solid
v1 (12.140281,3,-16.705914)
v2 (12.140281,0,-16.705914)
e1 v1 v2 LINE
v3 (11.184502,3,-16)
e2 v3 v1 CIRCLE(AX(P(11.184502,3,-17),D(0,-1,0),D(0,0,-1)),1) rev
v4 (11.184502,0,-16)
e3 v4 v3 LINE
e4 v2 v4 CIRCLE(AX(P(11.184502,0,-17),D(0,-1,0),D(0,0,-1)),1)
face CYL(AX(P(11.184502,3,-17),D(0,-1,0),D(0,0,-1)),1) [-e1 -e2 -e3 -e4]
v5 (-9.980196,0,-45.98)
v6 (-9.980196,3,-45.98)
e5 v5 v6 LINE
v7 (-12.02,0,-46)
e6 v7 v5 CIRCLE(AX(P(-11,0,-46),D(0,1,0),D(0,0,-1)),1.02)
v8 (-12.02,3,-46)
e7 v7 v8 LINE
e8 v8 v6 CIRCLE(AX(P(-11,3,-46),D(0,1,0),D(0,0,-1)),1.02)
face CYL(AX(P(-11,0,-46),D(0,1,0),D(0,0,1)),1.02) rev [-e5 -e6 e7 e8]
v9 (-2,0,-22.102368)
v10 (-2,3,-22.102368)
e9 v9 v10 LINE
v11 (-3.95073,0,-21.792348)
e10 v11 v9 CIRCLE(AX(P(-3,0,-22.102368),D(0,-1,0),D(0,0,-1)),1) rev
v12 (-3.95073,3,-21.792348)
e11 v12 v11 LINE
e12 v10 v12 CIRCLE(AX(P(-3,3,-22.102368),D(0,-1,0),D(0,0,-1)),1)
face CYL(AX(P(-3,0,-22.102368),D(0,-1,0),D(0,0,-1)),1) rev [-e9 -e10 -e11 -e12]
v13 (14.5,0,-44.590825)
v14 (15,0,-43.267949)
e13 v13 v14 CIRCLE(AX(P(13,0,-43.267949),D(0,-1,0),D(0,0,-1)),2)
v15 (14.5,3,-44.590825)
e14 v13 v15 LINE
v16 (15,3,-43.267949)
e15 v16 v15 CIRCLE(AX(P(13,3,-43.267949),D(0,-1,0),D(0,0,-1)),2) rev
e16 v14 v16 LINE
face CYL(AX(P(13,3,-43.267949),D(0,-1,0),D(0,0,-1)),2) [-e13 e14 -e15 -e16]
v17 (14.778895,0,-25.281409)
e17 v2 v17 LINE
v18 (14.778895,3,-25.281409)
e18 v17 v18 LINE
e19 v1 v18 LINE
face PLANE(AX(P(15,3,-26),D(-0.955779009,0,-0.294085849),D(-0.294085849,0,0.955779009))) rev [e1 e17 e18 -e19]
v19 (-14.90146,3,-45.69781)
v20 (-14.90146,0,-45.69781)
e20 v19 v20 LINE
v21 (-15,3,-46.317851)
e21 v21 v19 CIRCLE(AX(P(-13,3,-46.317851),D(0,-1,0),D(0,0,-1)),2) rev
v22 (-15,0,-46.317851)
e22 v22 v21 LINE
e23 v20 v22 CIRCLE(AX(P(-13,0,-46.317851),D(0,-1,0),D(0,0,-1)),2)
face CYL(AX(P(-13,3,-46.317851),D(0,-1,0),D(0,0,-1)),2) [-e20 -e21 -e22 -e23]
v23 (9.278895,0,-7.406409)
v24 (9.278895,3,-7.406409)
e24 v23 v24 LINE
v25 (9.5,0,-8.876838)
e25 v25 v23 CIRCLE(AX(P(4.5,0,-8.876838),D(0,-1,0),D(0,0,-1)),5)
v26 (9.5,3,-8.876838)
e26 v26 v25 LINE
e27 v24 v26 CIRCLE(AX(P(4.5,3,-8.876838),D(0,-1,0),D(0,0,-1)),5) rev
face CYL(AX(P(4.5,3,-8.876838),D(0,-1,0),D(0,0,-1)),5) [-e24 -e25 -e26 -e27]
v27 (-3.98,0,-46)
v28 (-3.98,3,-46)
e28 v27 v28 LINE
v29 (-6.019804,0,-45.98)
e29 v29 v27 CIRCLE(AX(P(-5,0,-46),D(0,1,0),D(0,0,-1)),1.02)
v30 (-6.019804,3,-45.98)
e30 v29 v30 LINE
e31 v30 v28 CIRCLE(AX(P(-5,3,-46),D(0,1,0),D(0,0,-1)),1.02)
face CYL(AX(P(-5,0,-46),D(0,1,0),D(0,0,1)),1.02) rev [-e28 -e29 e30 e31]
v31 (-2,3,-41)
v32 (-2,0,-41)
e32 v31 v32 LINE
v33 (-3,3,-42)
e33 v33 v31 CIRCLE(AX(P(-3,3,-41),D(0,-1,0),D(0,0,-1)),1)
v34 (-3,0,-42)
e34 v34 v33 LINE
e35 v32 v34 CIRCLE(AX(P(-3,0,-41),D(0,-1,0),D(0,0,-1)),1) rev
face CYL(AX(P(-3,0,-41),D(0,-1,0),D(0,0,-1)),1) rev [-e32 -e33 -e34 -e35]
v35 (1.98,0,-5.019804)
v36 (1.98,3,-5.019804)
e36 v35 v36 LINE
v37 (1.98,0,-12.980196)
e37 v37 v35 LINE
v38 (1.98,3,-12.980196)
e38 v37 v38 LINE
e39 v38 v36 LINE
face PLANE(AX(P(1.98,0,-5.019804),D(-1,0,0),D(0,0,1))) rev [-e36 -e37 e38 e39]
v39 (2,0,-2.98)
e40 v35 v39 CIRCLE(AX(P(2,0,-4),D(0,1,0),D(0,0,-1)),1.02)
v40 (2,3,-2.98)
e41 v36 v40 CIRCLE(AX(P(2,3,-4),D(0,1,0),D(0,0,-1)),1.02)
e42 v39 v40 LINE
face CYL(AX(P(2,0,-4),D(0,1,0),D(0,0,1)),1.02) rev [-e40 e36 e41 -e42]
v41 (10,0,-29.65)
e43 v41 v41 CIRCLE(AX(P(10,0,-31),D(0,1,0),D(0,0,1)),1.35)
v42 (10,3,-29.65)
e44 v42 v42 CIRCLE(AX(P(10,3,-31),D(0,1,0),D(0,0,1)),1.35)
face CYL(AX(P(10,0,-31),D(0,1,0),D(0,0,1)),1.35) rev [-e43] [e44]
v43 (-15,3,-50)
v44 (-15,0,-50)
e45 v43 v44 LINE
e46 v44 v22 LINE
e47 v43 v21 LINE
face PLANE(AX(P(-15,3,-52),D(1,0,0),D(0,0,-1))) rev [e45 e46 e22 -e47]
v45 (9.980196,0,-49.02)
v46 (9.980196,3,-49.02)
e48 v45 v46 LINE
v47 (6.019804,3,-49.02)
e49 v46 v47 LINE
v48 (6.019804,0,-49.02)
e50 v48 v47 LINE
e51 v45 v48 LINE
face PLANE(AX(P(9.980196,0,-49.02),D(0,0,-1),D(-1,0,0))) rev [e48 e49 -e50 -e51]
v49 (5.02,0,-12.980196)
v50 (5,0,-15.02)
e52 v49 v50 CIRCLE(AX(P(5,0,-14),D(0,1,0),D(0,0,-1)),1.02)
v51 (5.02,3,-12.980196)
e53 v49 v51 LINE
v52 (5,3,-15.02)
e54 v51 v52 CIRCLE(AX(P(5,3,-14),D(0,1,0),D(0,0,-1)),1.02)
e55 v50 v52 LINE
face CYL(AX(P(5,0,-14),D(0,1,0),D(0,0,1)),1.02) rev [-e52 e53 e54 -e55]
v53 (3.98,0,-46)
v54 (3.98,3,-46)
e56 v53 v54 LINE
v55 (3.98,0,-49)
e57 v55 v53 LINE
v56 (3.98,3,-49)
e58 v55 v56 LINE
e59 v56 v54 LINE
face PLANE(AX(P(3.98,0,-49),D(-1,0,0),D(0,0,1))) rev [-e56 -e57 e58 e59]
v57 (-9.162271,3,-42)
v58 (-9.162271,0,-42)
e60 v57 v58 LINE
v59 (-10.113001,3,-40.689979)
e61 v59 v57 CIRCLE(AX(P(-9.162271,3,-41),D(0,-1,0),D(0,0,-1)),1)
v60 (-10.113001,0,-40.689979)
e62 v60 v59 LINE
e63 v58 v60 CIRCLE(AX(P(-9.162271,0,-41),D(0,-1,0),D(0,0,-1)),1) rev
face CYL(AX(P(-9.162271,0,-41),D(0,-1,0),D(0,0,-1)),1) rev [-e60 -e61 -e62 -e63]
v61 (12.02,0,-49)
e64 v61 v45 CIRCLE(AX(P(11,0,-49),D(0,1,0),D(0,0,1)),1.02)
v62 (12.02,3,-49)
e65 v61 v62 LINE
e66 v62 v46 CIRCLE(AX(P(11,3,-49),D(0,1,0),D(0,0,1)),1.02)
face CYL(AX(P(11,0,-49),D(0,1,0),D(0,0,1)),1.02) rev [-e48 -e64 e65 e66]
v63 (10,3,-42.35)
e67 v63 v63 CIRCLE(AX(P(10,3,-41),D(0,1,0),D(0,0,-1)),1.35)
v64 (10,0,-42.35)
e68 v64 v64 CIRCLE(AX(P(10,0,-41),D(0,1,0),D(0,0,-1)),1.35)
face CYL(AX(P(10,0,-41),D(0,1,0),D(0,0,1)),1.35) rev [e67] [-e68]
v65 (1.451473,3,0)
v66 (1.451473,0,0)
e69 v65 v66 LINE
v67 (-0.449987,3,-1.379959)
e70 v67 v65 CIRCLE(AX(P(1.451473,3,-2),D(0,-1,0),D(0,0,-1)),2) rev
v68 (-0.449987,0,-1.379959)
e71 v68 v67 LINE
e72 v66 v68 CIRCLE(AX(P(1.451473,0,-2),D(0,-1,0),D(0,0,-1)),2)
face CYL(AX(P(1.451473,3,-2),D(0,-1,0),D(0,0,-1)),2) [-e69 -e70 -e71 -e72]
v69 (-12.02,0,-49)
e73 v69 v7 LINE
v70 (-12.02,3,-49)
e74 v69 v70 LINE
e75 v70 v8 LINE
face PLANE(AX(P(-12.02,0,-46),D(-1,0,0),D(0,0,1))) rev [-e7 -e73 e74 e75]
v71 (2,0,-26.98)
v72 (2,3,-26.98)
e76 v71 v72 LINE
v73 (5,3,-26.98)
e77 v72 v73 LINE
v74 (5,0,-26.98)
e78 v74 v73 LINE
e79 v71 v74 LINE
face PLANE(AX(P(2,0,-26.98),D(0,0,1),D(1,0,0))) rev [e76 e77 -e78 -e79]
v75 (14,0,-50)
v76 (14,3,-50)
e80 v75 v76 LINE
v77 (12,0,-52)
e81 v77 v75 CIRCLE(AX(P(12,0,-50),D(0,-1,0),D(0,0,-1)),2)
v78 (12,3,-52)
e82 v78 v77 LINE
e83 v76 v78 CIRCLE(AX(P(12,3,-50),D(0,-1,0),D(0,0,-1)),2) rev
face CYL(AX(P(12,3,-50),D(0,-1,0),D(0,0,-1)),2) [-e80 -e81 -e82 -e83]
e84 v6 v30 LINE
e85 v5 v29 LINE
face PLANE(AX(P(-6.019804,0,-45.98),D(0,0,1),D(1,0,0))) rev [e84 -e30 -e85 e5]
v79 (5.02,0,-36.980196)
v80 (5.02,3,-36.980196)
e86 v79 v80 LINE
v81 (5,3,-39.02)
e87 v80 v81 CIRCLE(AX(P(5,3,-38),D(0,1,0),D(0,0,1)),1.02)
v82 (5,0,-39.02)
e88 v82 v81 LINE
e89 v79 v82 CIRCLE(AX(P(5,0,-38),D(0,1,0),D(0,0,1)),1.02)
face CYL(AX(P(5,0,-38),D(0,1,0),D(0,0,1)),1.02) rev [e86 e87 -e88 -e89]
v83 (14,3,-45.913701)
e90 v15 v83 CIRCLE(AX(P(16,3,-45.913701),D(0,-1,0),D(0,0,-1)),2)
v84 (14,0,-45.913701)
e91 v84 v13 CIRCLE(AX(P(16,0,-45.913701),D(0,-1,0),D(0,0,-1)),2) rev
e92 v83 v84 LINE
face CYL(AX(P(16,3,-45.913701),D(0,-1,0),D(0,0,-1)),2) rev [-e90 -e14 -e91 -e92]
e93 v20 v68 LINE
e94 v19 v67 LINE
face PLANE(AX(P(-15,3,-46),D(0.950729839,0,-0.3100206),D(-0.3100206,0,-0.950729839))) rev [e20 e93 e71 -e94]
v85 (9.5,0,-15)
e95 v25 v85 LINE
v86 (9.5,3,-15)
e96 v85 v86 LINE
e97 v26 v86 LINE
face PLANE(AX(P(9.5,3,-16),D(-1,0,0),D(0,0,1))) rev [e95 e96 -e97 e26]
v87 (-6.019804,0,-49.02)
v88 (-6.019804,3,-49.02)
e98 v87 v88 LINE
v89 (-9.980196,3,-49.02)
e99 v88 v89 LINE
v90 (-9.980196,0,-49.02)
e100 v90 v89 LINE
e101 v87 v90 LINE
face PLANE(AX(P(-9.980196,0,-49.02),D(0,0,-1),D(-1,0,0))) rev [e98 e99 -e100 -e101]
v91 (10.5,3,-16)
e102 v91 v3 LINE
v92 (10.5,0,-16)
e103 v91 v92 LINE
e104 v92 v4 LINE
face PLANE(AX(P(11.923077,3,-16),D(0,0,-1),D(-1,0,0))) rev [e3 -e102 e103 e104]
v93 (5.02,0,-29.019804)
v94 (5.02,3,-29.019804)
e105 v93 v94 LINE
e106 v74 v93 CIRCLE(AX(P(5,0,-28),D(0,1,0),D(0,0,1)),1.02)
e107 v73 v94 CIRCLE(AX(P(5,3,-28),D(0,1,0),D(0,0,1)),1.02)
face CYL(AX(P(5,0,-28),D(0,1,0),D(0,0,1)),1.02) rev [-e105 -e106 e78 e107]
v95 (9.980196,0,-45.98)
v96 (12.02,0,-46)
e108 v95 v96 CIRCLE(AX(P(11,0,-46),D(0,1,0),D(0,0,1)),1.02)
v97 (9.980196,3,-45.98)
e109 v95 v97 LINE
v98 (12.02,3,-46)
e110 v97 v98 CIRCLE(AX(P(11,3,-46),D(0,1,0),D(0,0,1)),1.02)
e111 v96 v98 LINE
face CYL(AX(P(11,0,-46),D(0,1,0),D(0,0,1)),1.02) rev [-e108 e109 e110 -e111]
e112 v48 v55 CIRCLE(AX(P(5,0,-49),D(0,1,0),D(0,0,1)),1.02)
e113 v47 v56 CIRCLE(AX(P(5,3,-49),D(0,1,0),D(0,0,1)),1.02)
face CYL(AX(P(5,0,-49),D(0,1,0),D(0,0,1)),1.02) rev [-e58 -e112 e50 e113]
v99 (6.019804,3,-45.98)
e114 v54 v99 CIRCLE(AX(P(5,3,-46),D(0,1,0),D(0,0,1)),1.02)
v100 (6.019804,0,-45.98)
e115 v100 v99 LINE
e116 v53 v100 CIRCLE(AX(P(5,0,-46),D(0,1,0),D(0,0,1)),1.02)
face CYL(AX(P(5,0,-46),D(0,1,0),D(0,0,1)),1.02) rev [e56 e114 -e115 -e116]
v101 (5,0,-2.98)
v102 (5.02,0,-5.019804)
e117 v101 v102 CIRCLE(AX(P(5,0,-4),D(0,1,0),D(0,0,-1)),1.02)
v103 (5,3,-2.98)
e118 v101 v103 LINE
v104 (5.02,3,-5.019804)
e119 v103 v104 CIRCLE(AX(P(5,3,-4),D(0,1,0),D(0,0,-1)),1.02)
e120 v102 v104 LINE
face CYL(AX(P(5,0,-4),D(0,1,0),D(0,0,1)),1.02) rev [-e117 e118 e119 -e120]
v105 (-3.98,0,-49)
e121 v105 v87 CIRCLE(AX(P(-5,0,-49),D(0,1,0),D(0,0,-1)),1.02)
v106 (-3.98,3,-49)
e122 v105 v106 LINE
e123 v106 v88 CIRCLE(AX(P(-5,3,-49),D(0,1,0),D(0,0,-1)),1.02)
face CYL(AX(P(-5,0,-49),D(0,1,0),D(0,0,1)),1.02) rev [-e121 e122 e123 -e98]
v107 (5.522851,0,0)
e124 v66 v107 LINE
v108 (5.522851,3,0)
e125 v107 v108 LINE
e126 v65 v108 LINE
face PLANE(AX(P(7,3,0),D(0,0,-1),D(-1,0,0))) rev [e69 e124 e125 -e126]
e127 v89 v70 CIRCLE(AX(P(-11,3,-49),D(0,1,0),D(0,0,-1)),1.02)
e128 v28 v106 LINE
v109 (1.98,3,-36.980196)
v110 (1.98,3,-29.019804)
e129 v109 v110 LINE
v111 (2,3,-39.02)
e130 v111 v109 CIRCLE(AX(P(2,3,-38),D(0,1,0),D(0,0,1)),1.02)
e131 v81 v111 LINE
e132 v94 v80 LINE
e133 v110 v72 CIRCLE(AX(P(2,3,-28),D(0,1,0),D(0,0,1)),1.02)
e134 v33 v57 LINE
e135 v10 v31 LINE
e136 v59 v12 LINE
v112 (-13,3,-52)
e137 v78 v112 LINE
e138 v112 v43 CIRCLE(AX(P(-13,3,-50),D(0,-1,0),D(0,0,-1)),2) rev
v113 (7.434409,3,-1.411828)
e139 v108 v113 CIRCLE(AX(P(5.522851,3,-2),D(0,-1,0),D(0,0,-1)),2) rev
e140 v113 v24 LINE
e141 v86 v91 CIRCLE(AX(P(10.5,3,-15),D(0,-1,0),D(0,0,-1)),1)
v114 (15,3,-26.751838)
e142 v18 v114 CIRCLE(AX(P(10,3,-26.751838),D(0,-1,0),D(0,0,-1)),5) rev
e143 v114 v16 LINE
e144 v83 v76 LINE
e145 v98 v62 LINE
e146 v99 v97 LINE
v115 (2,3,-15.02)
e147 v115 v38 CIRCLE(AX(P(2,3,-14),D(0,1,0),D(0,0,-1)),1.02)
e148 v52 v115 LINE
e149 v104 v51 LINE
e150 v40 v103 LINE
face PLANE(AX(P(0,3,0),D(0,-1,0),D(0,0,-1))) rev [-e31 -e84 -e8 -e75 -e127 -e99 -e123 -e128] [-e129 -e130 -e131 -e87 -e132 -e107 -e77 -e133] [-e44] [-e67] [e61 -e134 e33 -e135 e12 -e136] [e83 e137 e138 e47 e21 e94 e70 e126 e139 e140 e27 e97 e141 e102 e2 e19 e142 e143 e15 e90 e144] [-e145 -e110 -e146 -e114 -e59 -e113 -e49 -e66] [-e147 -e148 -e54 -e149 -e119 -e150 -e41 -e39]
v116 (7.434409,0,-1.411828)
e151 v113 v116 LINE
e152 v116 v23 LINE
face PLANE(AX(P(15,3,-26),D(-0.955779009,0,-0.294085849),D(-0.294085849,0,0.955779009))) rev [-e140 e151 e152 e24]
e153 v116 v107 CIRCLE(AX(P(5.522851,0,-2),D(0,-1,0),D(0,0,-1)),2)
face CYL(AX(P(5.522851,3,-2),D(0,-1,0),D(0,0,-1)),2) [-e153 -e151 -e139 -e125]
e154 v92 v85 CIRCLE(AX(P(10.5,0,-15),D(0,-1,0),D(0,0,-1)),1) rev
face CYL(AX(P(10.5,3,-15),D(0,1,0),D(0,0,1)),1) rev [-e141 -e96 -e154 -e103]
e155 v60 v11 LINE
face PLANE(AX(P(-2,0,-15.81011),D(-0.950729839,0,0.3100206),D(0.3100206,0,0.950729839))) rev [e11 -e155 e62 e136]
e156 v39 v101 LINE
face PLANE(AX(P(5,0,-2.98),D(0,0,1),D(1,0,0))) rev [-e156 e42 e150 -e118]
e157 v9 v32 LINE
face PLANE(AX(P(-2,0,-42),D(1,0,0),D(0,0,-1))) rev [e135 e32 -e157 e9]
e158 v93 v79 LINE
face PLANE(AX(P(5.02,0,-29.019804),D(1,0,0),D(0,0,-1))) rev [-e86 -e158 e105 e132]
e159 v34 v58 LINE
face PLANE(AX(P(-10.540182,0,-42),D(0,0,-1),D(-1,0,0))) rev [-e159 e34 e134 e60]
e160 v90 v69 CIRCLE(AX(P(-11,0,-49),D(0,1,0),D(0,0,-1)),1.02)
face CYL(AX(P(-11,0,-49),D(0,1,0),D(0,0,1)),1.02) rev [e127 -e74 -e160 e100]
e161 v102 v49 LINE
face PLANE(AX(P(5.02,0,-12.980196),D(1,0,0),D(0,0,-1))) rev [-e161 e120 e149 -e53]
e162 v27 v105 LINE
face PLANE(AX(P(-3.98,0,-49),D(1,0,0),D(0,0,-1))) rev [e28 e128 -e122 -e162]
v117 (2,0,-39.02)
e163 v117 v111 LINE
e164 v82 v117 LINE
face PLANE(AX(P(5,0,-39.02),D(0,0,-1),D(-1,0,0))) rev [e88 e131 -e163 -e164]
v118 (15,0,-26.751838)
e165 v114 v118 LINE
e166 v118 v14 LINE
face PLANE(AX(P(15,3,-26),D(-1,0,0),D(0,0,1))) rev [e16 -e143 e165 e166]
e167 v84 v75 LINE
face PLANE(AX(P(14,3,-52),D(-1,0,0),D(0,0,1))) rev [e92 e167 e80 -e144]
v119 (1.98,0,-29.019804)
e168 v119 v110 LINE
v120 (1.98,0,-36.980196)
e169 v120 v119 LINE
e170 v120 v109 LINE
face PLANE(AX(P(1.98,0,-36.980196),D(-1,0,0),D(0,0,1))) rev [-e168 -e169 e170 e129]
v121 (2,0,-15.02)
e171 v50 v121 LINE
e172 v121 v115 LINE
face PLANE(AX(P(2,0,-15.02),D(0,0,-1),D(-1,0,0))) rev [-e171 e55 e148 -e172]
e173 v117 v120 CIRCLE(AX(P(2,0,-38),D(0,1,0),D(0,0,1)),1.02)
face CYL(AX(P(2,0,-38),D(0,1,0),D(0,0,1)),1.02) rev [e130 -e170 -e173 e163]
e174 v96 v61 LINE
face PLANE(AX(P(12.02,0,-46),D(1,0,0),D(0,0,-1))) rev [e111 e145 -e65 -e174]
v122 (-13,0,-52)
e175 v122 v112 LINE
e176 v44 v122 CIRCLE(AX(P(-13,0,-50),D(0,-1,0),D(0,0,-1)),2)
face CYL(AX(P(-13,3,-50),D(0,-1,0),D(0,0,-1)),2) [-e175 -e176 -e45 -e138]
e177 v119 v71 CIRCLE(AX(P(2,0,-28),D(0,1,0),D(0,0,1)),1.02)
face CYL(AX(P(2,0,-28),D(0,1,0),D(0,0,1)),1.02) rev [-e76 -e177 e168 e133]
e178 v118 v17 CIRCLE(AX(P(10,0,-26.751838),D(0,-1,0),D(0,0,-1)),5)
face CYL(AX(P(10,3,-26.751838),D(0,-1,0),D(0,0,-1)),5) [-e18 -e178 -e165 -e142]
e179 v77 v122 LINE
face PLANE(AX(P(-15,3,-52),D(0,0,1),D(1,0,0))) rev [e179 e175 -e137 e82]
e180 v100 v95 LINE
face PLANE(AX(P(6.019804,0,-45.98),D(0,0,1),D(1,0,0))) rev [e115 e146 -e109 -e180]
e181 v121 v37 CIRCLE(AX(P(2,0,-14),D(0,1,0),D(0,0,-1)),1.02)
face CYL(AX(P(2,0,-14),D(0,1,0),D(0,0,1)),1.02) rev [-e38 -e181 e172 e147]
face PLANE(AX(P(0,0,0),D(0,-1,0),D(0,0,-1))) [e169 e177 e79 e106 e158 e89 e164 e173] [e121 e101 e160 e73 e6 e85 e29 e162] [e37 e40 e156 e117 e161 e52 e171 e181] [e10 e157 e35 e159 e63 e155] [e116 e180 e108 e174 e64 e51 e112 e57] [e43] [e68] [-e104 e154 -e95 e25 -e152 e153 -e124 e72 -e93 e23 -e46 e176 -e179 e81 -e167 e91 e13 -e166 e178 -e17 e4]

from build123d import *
from OCP.BRepFilletAPI import BRepFilletAPI_MakeFillet

# Parameters (mm, degrees)
SKETCH_1_W             = 3
SKETCH_1_H             = 12
SKETCH_1_W_2           = 8
SKETCH_1_H_2           = 3
EXTRUDE_1_DEPTH        = 3
SKETCH_3_R             = 1
CUT_EXTRUDE_1_DEPTH    = 55.203320931
SKETCH_4_W             = 1
SKETCH_4_H             = 7
CUT_EXTRUDE_2_DEPTH    = 55.203320931
SKETCH_6_R             = 1.35
CUT_EXTRUDE_3_DEPTH    = 55.203320931
CUT_EXTRUDE_4_DEPTH    = 55.203320931
CUT_EXTRUDE_6_DEPTH    = 55.203320931
FILLET_1_R             = 2
FILLET_2_R1            = 5
FILLET_2_R2            = 1
FILLET_2_R3            = 2
CUT_EXTRUDE_5602_DEPTH = 55.203320931
FILLET_3_R1            = 1
FILLET_3_R2            = 5


with BuildPart() as part:
    # 草图1 → 凸台-拉伸1 (new body)
    with BuildSketch(Plane(origin=(0, 0, 0), x_dir=(1, 0, 0), z_dir=(0, 1, 0))):
        Polygon((15, 26), (15, 52), (0, 52), (-15, 52), (-15, 46), (0, 0), (7, 0), align=None)
        with Locations((3.5, 9)):
            Rectangle(SKETCH_1_W, SKETCH_1_H, mode=Mode.SUBTRACT)
        with Locations((3.5, 33)):
            Rectangle(SKETCH_1_W, SKETCH_1_H, mode=Mode.SUBTRACT)
        with Locations((-8, 47.5)):
            Rectangle(SKETCH_1_W_2, SKETCH_1_H_2, mode=Mode.SUBTRACT)
        with Locations((8, 47.5)):
            Rectangle(SKETCH_1_W_2, SKETCH_1_H_2, mode=Mode.SUBTRACT)
    extrude(amount=EXTRUDE_1_DEPTH)

    # 草图3 → 切除-拉伸1 (cut, through all)
    with BuildSketch(Plane(origin=(0, 3, 0), x_dir=(1, 0, 0), z_dir=(0, 1, 0))):
        with Locations((5, 4)):
            Circle(SKETCH_3_R)
        with Locations((5, 14)):
            Circle(SKETCH_3_R)
        with Locations((2, 4)):
            Circle(SKETCH_3_R)
        with Locations((2, 14)):
            Circle(SKETCH_3_R)
        with Locations((2, 28)):
            Circle(SKETCH_3_R)
        with Locations((2, 38)):
            Circle(SKETCH_3_R)
        with Locations((5, 28)):
            Circle(SKETCH_3_R)
        with Locations((5, 38)):
            Circle(SKETCH_3_R)
        with Locations((-5, 49)):
            Circle(SKETCH_3_R)
        with Locations((-11, 49)):
            Circle(SKETCH_3_R)
        with Locations((-11, 46)):
            Circle(SKETCH_3_R)
        with Locations((-5, 46)):
            Circle(SKETCH_3_R)
        with Locations((5, 46)):
            Circle(SKETCH_3_R)
        with Locations((11, 46)):
            Circle(SKETCH_3_R)
        with Locations((11, 49)):
            Circle(SKETCH_3_R)
        with Locations((5, 49)):
            Circle(SKETCH_3_R)
    extrude(amount=-CUT_EXTRUDE_1_DEPTH, mode=Mode.SUBTRACT)

    # 草图4 → 切除-拉伸2 (cut, through all)
    with BuildSketch(Plane.XZ):
        with Locations((14.5, -48.5)):
            Rectangle(SKETCH_4_W, SKETCH_4_H)
    extrude(amount=-CUT_EXTRUDE_2_DEPTH, mode=Mode.SUBTRACT)

    # 草图6 → 切除-拉伸3 (cut, through all)
    with BuildSketch(Plane(origin=(0, 3, 0), x_dir=(1, 0, 0), z_dir=(0, 1, 0))):
        with Locations(Location((10, 31, 0), (0, 0, 270))):
            Circle(SKETCH_6_R)
        with Locations(Location((10, 41, 0), (0, 0, 90))):
            Circle(SKETCH_6_R)
    extrude(amount=-CUT_EXTRUDE_3_DEPTH, mode=Mode.SUBTRACT)

    # 草图7 → 切除-拉伸4 (cut, through all)
    with BuildSketch(Plane(origin=(0, 3, 0), x_dir=(1, 0, 0), z_dir=(0, 1, 0))):
        Polygon((-2, 15.810109656), (-10.540181634, 42), (-2, 42), align=None)
    extrude(amount=-CUT_EXTRUDE_4_DEPTH, mode=Mode.SUBTRACT)

    # 草图9 → 切除-拉伸6 (cut, through all)
    with BuildSketch(Plane.XZ):
        Polygon((11.923076923, -16), (9.5, -16), (9.5, -8.125), align=None)
    extrude(amount=-CUT_EXTRUDE_6_DEPTH, mode=Mode.SUBTRACT)

    # 圆角1
    # the kernel refuses this fillet: 2 mm, written as the material it takes off along each edge
    with BuildSketch(Plane(origin=(15, -4.330127019, -45), x_dir=(0, 0, 1), z_dir=(0, 1, 0))) as fillet_1_piece_1:
        with BuildLine():
            CenterArc((1.732050808, -2), FILLET_1_R, 90, 60)
            Line((0, -1), (-0.034641016, -0.98))
            ThreePointArc((-0.034641016, -0.98), (-0.04, -0.5), (-0.04, 0))
            Line((-0.04, 0), (0, 0.04))
            Line((0, 0.04), (1.732050808, 0.04))
            Line((1.732050808, 0.04), (1.732050808, 0))
        make_face()
    extrude(amount=11.660254038, mode=Mode.SUBTRACT)
    with BuildSketch(Plane(origin=(7, -3.692873273, 0), x_dir=(-1, 0, 0), z_dir=(0, 1, 0))) as fillet_1_piece_2:
        with BuildLine():
            CenterArc((FILLET_1_R * 0.738574654518, -FILLET_1_R), FILLET_1_R, 90, 72.897271031)
            Line((-FILLET_1_R * 0.217204354204, -FILLET_1_R * 0.705914151162), (-FILLET_1_R * 0.236319934378, -FILLET_1_R * 0.700032434186))
            Line((-FILLET_1_R * 0.236319934378, -FILLET_1_R * 0.700032434186), (-FILLET_1_R * 0.0147714930904, FILLET_1_R * 0.02))
            Line((-FILLET_1_R * 0.0147714930904, FILLET_1_R * 0.02), (FILLET_1_R * 0.738574654518, FILLET_1_R * 0.02))
            Line((FILLET_1_R * 0.738574654518, FILLET_1_R * 0.02), (FILLET_1_R * 0.738574654518, 0))
        make_face()
    extrude(amount=10.385746545, mode=Mode.SUBTRACT)
    with BuildSketch(Plane(origin=(0, -3.628682784, 0), x_dir=(1, 0, 0), z_dir=(0, 1, 0))) as fillet_1_piece_3:
        with BuildLine():
            CenterArc((FILLET_1_R * 0.725736556818, FILLET_1_R), FILLET_1_R, 198.060471936, 71.939528064)
            Line((-FILLET_1_R * 0.224993282664, FILLET_1_R * 0.689979400169), (-FILLET_1_R * 0.244007879453, FILLET_1_R * 0.683778988172))
            Line((-FILLET_1_R * 0.244007879453, FILLET_1_R * 0.683778988172), (-FILLET_1_R * 0.0145147311364, -FILLET_1_R * 0.02))
            Line((-FILLET_1_R * 0.0145147311364, -FILLET_1_R * 0.02), (FILLET_1_R * 0.725736556818, -FILLET_1_R * 0.02))
            Line((FILLET_1_R * 0.725736556818, -FILLET_1_R * 0.02), (FILLET_1_R * 0.725736556818, 0))
        make_face()
    extrude(amount=10.257365568, mode=Mode.SUBTRACT)
    with BuildSketch(Plane(origin=(-15, -0.794627205, -46), x_dir=(0.31002059983091895, 0, 0.9507298394814782), z_dir=(0, 1, 0))) as fillet_1_piece_4:
        with BuildLine():
            CenterArc((FILLET_1_R * 0.158925440907, FILLET_1_R), FILLET_1_R, 251.939528064, 18.060471936)
            Line((-FILLET_1_R * 0.151095158923, FILLET_1_R * 0.0492701605185), (-FILLET_1_R * 0.15729557092, FILLET_1_R * 0.0302555637289))
            Line((-FILLET_1_R * 0.15729557092, FILLET_1_R * 0.0302555637289), (-FILLET_1_R * 0.00317850881815, -FILLET_1_R * 0.02))
            Line((-FILLET_1_R * 0.00317850881815, -FILLET_1_R * 0.02), (FILLET_1_R * 0.158925440907, -FILLET_1_R * 0.02))
            Line((FILLET_1_R * 0.158925440907, -FILLET_1_R * 0.02), (FILLET_1_R * 0.158925440907, 0))
        make_face()
    extrude(amount=4.589254409, mode=Mode.SUBTRACT)
    with BuildSketch(Plane(origin=(14, -5, -52), x_dir=(-1, 0, 0), z_dir=(0, 1, 0)), Plane(origin=(-15, -5, -52), x_dir=(0, 0, 1), z_dir=(0, 1, 0))) as fillet_1_piece_5:
        with BuildLine():
            CenterArc((FILLET_1_R, FILLET_1_R), FILLET_1_R, 180, 90)
            Line((0, FILLET_1_R), (-FILLET_1_R * 0.02, FILLET_1_R))
            Line((-FILLET_1_R * 0.02, FILLET_1_R), (-FILLET_1_R * 0.02, -FILLET_1_R * 0.02))
            Line((-FILLET_1_R * 0.02, -FILLET_1_R * 0.02), (FILLET_1_R, -FILLET_1_R * 0.02))
            Line((FILLET_1_R, -FILLET_1_R * 0.02), (FILLET_1_R, 0))
        make_face()
    extrude(amount=13, mode=Mode.SUBTRACT)

    # 圆角2: one fillet with a radius per group of edges: ONE call of the kernel's fillet builder (fillet() takes one radius for all edges)
    fillet_2_edges_1 = [part.edges().sort_by_distance(p)[0] for p in [
        (15, 1.5, -26),
    ]]
    fillet_2_edges_2 = [part.edges().sort_by_distance(p)[0] for p in [
        (-10.540181634, 1.5, -42),
        (-2, 1.5, -42),
        (-2, 1.5, -15.810109656),
    ]]
    fillet_2_edges_3 = [part.edges().sort_by_distance(p)[0] for p in [
        (14, 1.5, -45),
    ]]
    fillet_2 = BRepFilletAPI_MakeFillet(part.part.solid().wrapped)
    for e in fillet_2_edges_1:
        fillet_2.Add(FILLET_2_R1, e.wrapped)
    for e in fillet_2_edges_2:
        fillet_2.Add(FILLET_2_R2, e.wrapped)
    for e in fillet_2_edges_3:
        fillet_2.Add(FILLET_2_R3, e.wrapped)
    add(Compound.cast(fillet_2.Shape()), mode=Mode.REPLACE)

    # 草图8 → Cut-Extrude 5602 (cut, through all)
    with BuildSketch(Plane(origin=(0, 3, 0), x_dir=(1, 0, 0), z_dir=(0, 1, 0))):
        with BuildLine():
            Line((9.980196097, 49.02), (6.019803903, 49.02))
            ThreePointArc((6.019803903, 49.02), (4.989999519, 50.019950975), (3.98, 49))
            Line((3.98, 49), (3.98, 46))
            ThreePointArc((3.98, 46), (4.989999519, 44.980049025), (6.019803903, 45.98))
            Line((6.019803903, 45.98), (9.980196097, 45.98))
            ThreePointArc((9.980196097, 45.98), (11.010000481, 44.980049025), (12.02, 46))
            Line((12.02, 46), (12.02, 49))
            ThreePointArc((12.02, 49), (11.010000481, 50.019950975), (9.980196097, 49.02))
        make_face()
        with BuildLine():
            Line((-12.02, 46), (-12.02, 49))
            ThreePointArc((-12.02, 49), (-11.010000481, 50.019950975), (-9.980196097, 49.02))
            Line((-9.980196097, 49.02), (-6.019803903, 49.02))
            ThreePointArc((-6.019803903, 49.02), (-4.989999519, 50.019950975), (-3.98, 49))
            Line((-3.98, 49), (-3.98, 46))
            ThreePointArc((-3.98, 46), (-4.989999519, 44.980049025), (-6.019803903, 45.98))
            Line((-6.019803903, 45.98), (-9.980196097, 45.98))
            ThreePointArc((-9.980196097, 45.98), (-11.010000481, 44.980049025), (-12.02, 46))
        make_face()
        with BuildLine():
            Line((1.98, 36.980196097), (1.98, 29.019803903))
            ThreePointArc((1.98, 29.019803903), (0.980049025, 27.989999519), (2, 26.98))
            Line((2, 26.98), (5, 26.98))
            ThreePointArc((5, 26.98), (6.019950975, 27.989999519), (5.02, 29.019803903))
            Line((5.02, 29.019803903), (5.02, 36.980196097))
            ThreePointArc((5.02, 36.980196097), (6.019950975, 38.010000481), (5, 39.02))
            Line((5, 39.02), (2, 39.02))
            ThreePointArc((2, 39.02), (0.980049025, 38.010000481), (1.98, 36.980196097))
        make_face()
        with BuildLine():
            Line((5, 2.98), (2, 2.98))
            ThreePointArc((2, 2.98), (0.980049025, 3.989999519), (1.98, 5.019803903))
            Line((1.98, 5.019803903), (1.98, 12.980196097))
            ThreePointArc((1.98, 12.980196097), (0.980049025, 14.010000481), (2, 15.02))
            Line((2, 15.02), (5, 15.02))
            ThreePointArc((5, 15.02), (6.019950975, 14.010000481), (5.02, 12.980196097))
            Line((5.02, 12.980196097), (5.02, 5.019803903))
            ThreePointArc((5.02, 5.019803903), (6.019950975, 3.989999519), (5, 2.98))
        make_face()
    extrude(amount=-CUT_EXTRUDE_5602_DEPTH, mode=Mode.SUBTRACT)

    # 圆角3: one fillet with a radius per group of edges: ONE call of the kernel's fillet builder (fillet() takes one radius for all edges)
    fillet_3_edges_1 = [part.edges().sort_by_distance(p)[0] for p in [
        (9.5, 1.5, -16),
        (11.923076923, 1.5, -16),
    ]]
    fillet_3_edges_2 = [part.edges().sort_by_distance(p)[0] for p in [
        (9.5, 1.5, -8.125),
    ]]
    fillet_3 = BRepFilletAPI_MakeFillet(part.part.solid().wrapped)
    for e in fillet_3_edges_1:
        fillet_3.Add(FILLET_3_R1, e.wrapped)
    for e in fillet_3_edges_2:
        fillet_3.Add(FILLET_3_R2, e.wrapped)
    add(Compound.cast(fillet_3.Shape()), mode=Mode.REPLACE)


solid = part.part
